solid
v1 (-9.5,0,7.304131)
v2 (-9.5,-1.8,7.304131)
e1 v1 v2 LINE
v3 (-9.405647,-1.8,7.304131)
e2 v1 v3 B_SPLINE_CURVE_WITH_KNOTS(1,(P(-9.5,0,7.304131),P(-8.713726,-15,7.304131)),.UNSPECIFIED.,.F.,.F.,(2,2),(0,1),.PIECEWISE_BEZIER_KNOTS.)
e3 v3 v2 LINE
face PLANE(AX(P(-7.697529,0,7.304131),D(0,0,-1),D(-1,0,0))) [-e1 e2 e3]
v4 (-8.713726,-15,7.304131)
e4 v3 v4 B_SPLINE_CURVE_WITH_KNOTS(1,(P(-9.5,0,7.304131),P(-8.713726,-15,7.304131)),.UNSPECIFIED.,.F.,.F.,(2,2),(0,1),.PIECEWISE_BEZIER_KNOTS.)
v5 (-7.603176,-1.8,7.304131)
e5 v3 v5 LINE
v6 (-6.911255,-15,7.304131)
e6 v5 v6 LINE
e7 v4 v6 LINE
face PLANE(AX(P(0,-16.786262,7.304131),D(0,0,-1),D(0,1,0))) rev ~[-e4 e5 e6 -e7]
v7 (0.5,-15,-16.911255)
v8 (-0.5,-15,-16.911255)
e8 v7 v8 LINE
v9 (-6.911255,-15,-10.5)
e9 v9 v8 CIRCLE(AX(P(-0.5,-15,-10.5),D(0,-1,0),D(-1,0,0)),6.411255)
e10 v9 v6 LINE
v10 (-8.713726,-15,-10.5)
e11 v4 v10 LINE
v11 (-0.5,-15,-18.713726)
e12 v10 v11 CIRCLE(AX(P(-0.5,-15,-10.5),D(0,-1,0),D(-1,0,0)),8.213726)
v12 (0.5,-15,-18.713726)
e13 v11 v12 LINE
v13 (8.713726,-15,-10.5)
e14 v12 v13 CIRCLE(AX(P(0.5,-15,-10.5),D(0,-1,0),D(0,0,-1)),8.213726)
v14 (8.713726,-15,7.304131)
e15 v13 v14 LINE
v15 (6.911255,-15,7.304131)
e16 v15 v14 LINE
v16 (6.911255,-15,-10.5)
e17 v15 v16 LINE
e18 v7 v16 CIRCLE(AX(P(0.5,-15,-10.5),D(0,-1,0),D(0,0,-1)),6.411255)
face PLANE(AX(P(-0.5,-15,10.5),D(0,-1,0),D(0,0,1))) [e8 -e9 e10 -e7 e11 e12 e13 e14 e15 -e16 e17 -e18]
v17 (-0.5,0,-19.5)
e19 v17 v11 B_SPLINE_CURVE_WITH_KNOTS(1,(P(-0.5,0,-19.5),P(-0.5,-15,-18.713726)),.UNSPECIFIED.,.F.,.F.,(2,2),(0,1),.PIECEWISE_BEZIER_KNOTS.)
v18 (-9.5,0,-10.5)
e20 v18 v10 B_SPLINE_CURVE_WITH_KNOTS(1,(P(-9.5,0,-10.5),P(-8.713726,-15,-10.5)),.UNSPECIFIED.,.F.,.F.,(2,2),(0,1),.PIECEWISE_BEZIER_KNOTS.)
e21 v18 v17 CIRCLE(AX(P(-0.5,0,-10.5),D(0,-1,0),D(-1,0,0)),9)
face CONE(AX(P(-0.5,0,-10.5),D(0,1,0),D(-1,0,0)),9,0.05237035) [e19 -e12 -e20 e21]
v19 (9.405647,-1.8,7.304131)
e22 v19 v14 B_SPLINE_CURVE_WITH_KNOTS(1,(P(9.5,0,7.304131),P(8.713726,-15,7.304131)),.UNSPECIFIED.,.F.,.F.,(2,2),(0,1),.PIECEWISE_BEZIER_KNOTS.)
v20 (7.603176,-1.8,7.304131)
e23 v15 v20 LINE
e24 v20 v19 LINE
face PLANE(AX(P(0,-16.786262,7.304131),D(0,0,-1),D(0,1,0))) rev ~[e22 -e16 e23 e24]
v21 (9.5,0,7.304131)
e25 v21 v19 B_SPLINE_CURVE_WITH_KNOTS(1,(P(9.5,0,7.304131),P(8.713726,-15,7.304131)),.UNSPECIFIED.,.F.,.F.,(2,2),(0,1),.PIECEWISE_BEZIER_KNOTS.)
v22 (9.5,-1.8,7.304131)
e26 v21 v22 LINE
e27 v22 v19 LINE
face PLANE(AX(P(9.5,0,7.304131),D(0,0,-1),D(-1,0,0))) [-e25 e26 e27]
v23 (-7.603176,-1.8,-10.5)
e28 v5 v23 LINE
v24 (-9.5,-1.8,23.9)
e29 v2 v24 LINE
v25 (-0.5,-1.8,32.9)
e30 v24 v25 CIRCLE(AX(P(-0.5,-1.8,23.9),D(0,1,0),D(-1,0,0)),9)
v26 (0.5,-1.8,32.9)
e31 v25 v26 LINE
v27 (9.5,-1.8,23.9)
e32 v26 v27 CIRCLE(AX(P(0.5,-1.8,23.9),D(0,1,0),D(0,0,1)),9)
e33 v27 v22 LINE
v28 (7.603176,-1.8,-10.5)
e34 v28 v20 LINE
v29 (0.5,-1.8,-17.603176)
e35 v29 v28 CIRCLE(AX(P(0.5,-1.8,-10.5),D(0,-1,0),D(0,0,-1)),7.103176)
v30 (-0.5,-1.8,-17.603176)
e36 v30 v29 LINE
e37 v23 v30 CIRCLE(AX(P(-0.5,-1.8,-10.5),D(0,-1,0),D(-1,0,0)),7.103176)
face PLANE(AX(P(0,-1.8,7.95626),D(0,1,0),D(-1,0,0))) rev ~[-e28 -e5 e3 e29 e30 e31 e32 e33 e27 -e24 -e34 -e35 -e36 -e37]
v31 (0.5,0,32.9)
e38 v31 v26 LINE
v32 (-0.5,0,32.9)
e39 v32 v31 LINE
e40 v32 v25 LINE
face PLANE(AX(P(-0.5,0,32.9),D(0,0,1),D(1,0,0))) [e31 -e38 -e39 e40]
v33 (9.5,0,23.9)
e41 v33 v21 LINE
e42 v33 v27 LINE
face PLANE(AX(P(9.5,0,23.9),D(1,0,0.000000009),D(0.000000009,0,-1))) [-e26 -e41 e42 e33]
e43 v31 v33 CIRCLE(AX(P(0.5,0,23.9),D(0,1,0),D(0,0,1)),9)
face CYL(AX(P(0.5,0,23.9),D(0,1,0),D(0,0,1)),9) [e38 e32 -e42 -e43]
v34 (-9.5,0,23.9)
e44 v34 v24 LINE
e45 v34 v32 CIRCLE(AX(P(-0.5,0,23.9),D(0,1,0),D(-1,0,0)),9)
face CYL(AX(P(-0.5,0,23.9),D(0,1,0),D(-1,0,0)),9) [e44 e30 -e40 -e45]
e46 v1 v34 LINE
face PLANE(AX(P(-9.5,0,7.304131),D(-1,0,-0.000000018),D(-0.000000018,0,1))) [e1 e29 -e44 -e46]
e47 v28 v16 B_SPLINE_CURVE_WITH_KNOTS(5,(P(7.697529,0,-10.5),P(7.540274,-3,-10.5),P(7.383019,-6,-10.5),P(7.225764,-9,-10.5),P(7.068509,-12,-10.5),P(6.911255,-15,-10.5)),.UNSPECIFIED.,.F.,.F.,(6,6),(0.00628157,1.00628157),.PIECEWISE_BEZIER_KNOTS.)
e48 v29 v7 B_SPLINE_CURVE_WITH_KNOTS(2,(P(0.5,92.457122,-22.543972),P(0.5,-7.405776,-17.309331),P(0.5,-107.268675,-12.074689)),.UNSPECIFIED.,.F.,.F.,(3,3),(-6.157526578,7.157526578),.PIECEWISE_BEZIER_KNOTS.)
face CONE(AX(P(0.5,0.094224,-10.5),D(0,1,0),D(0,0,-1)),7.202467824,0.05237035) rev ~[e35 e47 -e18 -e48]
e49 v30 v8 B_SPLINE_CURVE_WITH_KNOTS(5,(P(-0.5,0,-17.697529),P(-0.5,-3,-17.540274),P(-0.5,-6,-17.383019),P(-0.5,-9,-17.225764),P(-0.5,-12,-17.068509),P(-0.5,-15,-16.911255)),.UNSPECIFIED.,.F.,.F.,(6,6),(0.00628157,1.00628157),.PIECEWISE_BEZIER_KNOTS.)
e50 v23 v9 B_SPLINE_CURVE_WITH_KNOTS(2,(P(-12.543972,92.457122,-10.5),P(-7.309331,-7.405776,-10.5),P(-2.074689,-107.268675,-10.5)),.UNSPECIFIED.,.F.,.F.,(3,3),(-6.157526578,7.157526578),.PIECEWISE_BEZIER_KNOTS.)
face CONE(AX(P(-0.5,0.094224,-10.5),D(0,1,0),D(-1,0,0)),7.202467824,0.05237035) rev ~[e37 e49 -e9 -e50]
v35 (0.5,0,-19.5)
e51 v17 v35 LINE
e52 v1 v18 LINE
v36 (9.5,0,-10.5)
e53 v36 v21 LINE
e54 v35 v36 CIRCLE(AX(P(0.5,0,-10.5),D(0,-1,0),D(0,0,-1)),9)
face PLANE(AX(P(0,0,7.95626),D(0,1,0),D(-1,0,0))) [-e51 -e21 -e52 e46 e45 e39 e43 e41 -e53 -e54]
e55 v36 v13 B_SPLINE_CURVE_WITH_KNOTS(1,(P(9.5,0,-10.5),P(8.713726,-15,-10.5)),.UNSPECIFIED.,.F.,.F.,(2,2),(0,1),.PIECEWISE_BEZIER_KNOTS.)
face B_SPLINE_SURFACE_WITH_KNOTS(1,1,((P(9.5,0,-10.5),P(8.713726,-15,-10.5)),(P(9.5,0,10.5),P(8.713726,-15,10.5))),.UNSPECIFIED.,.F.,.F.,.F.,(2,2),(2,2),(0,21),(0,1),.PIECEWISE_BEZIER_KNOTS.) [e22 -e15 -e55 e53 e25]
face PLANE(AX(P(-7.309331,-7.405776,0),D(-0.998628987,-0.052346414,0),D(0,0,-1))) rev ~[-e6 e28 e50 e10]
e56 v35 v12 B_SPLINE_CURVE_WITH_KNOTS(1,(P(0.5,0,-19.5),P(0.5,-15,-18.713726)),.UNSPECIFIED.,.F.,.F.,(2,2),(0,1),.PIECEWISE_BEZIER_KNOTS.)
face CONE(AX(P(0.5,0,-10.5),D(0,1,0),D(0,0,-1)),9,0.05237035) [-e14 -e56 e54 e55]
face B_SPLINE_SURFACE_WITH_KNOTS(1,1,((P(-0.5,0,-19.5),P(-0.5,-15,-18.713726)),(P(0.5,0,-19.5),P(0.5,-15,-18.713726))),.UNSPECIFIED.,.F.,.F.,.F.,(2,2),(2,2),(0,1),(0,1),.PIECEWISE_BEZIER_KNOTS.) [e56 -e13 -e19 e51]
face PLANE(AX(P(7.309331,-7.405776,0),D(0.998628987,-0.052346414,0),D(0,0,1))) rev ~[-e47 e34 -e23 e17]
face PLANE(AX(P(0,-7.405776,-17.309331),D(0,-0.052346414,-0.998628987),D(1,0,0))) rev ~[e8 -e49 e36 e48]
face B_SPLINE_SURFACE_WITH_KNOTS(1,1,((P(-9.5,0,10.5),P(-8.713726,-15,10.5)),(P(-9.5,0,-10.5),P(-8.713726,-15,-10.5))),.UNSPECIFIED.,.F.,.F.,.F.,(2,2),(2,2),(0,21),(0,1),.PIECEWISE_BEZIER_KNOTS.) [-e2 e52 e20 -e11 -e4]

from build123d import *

# Parameters (mm, degrees)
F1_DEPTH = 15
F1_TAPER = 3.0006
F2_T     = -1.8
F3_W     = 16.786262393
F3_H     = 17.0369902626
F4_DEPTH = 28
F6_DEPTH = 1.8


# Not quite as in the source:
# - ends of sketch curves that miss each other by under 0.0002 mm in the source are joined


with BuildPart() as f1:
    # F0 (on Front) → F1 (new body)
    with BuildSketch(Plane.XZ):
        with BuildLine():
            Line((0.5, 19.5), (-0.5, 19.5))
            ThreePointArc((-0.5, 19.5), (-6.8639610307, 16.8639610307), (-9.5, 10.5))
            Line((-9.5, 10.5), (-9.5, -10.5))
            ThreePointArc((-9.5, -10.5), (-6.8639610307, -16.8639610307), (-0.5, -19.5))
            Line((-0.5, -19.5), (0.5, -19.5))
            ThreePointArc((0.5, -19.5), (6.8639610307, -16.8639610307), (9.5, -10.5))
            Line((9.5, -10.5), (9.5, 10.5))
            ThreePointArc((9.5, 10.5), (6.8639610307, 16.8639610307), (0.5, 19.5))
        make_face()
    extrude(amount=F1_DEPTH, taper=F1_TAPER)

    # F2
    f2_openings = [f1.faces().sort_by_distance(p)[0] for p in [
        (0, 0, 0),
        (0, -15, 0),
    ]]
    offset(amount=F2_T, openings=f2_openings)

    # F3 (on Right) → F4 (cut, symmetric)
    with BuildSketch(Plane.YZ):
        with Locations((-8.3931311965, 15.8226261847)):
            Rectangle(F3_W, F3_H)
    extrude(amount=F4_DEPTH, both=True, mode=Mode.SUBTRACT)

    # F5 (on face) → F6 (join)
    with BuildSketch(Plane(origin=(0, 0, 0), x_dir=(-1, 0, 0), z_dir=(0, 1, 0))):
        with BuildLine():
            Line((0.5000003055, 32.8999999631), (-0.4999996945, 32.8999999631))
            ThreePointArc((-0.4999996945, 32.8999999631), (-6.8639607252, 30.2639609938), (-9.4999996945, 23.8999999631))
            Line((-9.4999996945, 23.8999999631), (-9.4999998419, 7.3041310534))
            Line((-9.4999998419, 7.3041310534), (-7.6975287879, 7.3041310534))
            Line((-7.6975287879, 7.3041310534), (-7.6975287879, -10.5))
            ThreePointArc((-7.6975287879, -10.5), (-5.5894214137, -15.5894214137), (-0.5, -17.6975287879))
            Line((-0.5, -17.6975287879), (0.5, -17.6975287879))
            ThreePointArc((0.5, -17.6975287879), (5.5894214137, -15.5894214137), (7.6975287879, -10.5))
            Line((7.6975287879, -10.5), (7.6975287879, 7.3041310534))
            Line((7.6975287879, 7.3041310534), (9.5, 7.3041310534))
            Line((9.5, 7.3041310534), (9.5000003055, 23.8999999631))
            ThreePointArc((9.5000003055, 23.8999999631), (6.8639613362, 30.2639609938), (0.5000003055, 32.8999999631))
        make_face()
    extrude(amount=-F6_DEPTH)


solid = f1.part
